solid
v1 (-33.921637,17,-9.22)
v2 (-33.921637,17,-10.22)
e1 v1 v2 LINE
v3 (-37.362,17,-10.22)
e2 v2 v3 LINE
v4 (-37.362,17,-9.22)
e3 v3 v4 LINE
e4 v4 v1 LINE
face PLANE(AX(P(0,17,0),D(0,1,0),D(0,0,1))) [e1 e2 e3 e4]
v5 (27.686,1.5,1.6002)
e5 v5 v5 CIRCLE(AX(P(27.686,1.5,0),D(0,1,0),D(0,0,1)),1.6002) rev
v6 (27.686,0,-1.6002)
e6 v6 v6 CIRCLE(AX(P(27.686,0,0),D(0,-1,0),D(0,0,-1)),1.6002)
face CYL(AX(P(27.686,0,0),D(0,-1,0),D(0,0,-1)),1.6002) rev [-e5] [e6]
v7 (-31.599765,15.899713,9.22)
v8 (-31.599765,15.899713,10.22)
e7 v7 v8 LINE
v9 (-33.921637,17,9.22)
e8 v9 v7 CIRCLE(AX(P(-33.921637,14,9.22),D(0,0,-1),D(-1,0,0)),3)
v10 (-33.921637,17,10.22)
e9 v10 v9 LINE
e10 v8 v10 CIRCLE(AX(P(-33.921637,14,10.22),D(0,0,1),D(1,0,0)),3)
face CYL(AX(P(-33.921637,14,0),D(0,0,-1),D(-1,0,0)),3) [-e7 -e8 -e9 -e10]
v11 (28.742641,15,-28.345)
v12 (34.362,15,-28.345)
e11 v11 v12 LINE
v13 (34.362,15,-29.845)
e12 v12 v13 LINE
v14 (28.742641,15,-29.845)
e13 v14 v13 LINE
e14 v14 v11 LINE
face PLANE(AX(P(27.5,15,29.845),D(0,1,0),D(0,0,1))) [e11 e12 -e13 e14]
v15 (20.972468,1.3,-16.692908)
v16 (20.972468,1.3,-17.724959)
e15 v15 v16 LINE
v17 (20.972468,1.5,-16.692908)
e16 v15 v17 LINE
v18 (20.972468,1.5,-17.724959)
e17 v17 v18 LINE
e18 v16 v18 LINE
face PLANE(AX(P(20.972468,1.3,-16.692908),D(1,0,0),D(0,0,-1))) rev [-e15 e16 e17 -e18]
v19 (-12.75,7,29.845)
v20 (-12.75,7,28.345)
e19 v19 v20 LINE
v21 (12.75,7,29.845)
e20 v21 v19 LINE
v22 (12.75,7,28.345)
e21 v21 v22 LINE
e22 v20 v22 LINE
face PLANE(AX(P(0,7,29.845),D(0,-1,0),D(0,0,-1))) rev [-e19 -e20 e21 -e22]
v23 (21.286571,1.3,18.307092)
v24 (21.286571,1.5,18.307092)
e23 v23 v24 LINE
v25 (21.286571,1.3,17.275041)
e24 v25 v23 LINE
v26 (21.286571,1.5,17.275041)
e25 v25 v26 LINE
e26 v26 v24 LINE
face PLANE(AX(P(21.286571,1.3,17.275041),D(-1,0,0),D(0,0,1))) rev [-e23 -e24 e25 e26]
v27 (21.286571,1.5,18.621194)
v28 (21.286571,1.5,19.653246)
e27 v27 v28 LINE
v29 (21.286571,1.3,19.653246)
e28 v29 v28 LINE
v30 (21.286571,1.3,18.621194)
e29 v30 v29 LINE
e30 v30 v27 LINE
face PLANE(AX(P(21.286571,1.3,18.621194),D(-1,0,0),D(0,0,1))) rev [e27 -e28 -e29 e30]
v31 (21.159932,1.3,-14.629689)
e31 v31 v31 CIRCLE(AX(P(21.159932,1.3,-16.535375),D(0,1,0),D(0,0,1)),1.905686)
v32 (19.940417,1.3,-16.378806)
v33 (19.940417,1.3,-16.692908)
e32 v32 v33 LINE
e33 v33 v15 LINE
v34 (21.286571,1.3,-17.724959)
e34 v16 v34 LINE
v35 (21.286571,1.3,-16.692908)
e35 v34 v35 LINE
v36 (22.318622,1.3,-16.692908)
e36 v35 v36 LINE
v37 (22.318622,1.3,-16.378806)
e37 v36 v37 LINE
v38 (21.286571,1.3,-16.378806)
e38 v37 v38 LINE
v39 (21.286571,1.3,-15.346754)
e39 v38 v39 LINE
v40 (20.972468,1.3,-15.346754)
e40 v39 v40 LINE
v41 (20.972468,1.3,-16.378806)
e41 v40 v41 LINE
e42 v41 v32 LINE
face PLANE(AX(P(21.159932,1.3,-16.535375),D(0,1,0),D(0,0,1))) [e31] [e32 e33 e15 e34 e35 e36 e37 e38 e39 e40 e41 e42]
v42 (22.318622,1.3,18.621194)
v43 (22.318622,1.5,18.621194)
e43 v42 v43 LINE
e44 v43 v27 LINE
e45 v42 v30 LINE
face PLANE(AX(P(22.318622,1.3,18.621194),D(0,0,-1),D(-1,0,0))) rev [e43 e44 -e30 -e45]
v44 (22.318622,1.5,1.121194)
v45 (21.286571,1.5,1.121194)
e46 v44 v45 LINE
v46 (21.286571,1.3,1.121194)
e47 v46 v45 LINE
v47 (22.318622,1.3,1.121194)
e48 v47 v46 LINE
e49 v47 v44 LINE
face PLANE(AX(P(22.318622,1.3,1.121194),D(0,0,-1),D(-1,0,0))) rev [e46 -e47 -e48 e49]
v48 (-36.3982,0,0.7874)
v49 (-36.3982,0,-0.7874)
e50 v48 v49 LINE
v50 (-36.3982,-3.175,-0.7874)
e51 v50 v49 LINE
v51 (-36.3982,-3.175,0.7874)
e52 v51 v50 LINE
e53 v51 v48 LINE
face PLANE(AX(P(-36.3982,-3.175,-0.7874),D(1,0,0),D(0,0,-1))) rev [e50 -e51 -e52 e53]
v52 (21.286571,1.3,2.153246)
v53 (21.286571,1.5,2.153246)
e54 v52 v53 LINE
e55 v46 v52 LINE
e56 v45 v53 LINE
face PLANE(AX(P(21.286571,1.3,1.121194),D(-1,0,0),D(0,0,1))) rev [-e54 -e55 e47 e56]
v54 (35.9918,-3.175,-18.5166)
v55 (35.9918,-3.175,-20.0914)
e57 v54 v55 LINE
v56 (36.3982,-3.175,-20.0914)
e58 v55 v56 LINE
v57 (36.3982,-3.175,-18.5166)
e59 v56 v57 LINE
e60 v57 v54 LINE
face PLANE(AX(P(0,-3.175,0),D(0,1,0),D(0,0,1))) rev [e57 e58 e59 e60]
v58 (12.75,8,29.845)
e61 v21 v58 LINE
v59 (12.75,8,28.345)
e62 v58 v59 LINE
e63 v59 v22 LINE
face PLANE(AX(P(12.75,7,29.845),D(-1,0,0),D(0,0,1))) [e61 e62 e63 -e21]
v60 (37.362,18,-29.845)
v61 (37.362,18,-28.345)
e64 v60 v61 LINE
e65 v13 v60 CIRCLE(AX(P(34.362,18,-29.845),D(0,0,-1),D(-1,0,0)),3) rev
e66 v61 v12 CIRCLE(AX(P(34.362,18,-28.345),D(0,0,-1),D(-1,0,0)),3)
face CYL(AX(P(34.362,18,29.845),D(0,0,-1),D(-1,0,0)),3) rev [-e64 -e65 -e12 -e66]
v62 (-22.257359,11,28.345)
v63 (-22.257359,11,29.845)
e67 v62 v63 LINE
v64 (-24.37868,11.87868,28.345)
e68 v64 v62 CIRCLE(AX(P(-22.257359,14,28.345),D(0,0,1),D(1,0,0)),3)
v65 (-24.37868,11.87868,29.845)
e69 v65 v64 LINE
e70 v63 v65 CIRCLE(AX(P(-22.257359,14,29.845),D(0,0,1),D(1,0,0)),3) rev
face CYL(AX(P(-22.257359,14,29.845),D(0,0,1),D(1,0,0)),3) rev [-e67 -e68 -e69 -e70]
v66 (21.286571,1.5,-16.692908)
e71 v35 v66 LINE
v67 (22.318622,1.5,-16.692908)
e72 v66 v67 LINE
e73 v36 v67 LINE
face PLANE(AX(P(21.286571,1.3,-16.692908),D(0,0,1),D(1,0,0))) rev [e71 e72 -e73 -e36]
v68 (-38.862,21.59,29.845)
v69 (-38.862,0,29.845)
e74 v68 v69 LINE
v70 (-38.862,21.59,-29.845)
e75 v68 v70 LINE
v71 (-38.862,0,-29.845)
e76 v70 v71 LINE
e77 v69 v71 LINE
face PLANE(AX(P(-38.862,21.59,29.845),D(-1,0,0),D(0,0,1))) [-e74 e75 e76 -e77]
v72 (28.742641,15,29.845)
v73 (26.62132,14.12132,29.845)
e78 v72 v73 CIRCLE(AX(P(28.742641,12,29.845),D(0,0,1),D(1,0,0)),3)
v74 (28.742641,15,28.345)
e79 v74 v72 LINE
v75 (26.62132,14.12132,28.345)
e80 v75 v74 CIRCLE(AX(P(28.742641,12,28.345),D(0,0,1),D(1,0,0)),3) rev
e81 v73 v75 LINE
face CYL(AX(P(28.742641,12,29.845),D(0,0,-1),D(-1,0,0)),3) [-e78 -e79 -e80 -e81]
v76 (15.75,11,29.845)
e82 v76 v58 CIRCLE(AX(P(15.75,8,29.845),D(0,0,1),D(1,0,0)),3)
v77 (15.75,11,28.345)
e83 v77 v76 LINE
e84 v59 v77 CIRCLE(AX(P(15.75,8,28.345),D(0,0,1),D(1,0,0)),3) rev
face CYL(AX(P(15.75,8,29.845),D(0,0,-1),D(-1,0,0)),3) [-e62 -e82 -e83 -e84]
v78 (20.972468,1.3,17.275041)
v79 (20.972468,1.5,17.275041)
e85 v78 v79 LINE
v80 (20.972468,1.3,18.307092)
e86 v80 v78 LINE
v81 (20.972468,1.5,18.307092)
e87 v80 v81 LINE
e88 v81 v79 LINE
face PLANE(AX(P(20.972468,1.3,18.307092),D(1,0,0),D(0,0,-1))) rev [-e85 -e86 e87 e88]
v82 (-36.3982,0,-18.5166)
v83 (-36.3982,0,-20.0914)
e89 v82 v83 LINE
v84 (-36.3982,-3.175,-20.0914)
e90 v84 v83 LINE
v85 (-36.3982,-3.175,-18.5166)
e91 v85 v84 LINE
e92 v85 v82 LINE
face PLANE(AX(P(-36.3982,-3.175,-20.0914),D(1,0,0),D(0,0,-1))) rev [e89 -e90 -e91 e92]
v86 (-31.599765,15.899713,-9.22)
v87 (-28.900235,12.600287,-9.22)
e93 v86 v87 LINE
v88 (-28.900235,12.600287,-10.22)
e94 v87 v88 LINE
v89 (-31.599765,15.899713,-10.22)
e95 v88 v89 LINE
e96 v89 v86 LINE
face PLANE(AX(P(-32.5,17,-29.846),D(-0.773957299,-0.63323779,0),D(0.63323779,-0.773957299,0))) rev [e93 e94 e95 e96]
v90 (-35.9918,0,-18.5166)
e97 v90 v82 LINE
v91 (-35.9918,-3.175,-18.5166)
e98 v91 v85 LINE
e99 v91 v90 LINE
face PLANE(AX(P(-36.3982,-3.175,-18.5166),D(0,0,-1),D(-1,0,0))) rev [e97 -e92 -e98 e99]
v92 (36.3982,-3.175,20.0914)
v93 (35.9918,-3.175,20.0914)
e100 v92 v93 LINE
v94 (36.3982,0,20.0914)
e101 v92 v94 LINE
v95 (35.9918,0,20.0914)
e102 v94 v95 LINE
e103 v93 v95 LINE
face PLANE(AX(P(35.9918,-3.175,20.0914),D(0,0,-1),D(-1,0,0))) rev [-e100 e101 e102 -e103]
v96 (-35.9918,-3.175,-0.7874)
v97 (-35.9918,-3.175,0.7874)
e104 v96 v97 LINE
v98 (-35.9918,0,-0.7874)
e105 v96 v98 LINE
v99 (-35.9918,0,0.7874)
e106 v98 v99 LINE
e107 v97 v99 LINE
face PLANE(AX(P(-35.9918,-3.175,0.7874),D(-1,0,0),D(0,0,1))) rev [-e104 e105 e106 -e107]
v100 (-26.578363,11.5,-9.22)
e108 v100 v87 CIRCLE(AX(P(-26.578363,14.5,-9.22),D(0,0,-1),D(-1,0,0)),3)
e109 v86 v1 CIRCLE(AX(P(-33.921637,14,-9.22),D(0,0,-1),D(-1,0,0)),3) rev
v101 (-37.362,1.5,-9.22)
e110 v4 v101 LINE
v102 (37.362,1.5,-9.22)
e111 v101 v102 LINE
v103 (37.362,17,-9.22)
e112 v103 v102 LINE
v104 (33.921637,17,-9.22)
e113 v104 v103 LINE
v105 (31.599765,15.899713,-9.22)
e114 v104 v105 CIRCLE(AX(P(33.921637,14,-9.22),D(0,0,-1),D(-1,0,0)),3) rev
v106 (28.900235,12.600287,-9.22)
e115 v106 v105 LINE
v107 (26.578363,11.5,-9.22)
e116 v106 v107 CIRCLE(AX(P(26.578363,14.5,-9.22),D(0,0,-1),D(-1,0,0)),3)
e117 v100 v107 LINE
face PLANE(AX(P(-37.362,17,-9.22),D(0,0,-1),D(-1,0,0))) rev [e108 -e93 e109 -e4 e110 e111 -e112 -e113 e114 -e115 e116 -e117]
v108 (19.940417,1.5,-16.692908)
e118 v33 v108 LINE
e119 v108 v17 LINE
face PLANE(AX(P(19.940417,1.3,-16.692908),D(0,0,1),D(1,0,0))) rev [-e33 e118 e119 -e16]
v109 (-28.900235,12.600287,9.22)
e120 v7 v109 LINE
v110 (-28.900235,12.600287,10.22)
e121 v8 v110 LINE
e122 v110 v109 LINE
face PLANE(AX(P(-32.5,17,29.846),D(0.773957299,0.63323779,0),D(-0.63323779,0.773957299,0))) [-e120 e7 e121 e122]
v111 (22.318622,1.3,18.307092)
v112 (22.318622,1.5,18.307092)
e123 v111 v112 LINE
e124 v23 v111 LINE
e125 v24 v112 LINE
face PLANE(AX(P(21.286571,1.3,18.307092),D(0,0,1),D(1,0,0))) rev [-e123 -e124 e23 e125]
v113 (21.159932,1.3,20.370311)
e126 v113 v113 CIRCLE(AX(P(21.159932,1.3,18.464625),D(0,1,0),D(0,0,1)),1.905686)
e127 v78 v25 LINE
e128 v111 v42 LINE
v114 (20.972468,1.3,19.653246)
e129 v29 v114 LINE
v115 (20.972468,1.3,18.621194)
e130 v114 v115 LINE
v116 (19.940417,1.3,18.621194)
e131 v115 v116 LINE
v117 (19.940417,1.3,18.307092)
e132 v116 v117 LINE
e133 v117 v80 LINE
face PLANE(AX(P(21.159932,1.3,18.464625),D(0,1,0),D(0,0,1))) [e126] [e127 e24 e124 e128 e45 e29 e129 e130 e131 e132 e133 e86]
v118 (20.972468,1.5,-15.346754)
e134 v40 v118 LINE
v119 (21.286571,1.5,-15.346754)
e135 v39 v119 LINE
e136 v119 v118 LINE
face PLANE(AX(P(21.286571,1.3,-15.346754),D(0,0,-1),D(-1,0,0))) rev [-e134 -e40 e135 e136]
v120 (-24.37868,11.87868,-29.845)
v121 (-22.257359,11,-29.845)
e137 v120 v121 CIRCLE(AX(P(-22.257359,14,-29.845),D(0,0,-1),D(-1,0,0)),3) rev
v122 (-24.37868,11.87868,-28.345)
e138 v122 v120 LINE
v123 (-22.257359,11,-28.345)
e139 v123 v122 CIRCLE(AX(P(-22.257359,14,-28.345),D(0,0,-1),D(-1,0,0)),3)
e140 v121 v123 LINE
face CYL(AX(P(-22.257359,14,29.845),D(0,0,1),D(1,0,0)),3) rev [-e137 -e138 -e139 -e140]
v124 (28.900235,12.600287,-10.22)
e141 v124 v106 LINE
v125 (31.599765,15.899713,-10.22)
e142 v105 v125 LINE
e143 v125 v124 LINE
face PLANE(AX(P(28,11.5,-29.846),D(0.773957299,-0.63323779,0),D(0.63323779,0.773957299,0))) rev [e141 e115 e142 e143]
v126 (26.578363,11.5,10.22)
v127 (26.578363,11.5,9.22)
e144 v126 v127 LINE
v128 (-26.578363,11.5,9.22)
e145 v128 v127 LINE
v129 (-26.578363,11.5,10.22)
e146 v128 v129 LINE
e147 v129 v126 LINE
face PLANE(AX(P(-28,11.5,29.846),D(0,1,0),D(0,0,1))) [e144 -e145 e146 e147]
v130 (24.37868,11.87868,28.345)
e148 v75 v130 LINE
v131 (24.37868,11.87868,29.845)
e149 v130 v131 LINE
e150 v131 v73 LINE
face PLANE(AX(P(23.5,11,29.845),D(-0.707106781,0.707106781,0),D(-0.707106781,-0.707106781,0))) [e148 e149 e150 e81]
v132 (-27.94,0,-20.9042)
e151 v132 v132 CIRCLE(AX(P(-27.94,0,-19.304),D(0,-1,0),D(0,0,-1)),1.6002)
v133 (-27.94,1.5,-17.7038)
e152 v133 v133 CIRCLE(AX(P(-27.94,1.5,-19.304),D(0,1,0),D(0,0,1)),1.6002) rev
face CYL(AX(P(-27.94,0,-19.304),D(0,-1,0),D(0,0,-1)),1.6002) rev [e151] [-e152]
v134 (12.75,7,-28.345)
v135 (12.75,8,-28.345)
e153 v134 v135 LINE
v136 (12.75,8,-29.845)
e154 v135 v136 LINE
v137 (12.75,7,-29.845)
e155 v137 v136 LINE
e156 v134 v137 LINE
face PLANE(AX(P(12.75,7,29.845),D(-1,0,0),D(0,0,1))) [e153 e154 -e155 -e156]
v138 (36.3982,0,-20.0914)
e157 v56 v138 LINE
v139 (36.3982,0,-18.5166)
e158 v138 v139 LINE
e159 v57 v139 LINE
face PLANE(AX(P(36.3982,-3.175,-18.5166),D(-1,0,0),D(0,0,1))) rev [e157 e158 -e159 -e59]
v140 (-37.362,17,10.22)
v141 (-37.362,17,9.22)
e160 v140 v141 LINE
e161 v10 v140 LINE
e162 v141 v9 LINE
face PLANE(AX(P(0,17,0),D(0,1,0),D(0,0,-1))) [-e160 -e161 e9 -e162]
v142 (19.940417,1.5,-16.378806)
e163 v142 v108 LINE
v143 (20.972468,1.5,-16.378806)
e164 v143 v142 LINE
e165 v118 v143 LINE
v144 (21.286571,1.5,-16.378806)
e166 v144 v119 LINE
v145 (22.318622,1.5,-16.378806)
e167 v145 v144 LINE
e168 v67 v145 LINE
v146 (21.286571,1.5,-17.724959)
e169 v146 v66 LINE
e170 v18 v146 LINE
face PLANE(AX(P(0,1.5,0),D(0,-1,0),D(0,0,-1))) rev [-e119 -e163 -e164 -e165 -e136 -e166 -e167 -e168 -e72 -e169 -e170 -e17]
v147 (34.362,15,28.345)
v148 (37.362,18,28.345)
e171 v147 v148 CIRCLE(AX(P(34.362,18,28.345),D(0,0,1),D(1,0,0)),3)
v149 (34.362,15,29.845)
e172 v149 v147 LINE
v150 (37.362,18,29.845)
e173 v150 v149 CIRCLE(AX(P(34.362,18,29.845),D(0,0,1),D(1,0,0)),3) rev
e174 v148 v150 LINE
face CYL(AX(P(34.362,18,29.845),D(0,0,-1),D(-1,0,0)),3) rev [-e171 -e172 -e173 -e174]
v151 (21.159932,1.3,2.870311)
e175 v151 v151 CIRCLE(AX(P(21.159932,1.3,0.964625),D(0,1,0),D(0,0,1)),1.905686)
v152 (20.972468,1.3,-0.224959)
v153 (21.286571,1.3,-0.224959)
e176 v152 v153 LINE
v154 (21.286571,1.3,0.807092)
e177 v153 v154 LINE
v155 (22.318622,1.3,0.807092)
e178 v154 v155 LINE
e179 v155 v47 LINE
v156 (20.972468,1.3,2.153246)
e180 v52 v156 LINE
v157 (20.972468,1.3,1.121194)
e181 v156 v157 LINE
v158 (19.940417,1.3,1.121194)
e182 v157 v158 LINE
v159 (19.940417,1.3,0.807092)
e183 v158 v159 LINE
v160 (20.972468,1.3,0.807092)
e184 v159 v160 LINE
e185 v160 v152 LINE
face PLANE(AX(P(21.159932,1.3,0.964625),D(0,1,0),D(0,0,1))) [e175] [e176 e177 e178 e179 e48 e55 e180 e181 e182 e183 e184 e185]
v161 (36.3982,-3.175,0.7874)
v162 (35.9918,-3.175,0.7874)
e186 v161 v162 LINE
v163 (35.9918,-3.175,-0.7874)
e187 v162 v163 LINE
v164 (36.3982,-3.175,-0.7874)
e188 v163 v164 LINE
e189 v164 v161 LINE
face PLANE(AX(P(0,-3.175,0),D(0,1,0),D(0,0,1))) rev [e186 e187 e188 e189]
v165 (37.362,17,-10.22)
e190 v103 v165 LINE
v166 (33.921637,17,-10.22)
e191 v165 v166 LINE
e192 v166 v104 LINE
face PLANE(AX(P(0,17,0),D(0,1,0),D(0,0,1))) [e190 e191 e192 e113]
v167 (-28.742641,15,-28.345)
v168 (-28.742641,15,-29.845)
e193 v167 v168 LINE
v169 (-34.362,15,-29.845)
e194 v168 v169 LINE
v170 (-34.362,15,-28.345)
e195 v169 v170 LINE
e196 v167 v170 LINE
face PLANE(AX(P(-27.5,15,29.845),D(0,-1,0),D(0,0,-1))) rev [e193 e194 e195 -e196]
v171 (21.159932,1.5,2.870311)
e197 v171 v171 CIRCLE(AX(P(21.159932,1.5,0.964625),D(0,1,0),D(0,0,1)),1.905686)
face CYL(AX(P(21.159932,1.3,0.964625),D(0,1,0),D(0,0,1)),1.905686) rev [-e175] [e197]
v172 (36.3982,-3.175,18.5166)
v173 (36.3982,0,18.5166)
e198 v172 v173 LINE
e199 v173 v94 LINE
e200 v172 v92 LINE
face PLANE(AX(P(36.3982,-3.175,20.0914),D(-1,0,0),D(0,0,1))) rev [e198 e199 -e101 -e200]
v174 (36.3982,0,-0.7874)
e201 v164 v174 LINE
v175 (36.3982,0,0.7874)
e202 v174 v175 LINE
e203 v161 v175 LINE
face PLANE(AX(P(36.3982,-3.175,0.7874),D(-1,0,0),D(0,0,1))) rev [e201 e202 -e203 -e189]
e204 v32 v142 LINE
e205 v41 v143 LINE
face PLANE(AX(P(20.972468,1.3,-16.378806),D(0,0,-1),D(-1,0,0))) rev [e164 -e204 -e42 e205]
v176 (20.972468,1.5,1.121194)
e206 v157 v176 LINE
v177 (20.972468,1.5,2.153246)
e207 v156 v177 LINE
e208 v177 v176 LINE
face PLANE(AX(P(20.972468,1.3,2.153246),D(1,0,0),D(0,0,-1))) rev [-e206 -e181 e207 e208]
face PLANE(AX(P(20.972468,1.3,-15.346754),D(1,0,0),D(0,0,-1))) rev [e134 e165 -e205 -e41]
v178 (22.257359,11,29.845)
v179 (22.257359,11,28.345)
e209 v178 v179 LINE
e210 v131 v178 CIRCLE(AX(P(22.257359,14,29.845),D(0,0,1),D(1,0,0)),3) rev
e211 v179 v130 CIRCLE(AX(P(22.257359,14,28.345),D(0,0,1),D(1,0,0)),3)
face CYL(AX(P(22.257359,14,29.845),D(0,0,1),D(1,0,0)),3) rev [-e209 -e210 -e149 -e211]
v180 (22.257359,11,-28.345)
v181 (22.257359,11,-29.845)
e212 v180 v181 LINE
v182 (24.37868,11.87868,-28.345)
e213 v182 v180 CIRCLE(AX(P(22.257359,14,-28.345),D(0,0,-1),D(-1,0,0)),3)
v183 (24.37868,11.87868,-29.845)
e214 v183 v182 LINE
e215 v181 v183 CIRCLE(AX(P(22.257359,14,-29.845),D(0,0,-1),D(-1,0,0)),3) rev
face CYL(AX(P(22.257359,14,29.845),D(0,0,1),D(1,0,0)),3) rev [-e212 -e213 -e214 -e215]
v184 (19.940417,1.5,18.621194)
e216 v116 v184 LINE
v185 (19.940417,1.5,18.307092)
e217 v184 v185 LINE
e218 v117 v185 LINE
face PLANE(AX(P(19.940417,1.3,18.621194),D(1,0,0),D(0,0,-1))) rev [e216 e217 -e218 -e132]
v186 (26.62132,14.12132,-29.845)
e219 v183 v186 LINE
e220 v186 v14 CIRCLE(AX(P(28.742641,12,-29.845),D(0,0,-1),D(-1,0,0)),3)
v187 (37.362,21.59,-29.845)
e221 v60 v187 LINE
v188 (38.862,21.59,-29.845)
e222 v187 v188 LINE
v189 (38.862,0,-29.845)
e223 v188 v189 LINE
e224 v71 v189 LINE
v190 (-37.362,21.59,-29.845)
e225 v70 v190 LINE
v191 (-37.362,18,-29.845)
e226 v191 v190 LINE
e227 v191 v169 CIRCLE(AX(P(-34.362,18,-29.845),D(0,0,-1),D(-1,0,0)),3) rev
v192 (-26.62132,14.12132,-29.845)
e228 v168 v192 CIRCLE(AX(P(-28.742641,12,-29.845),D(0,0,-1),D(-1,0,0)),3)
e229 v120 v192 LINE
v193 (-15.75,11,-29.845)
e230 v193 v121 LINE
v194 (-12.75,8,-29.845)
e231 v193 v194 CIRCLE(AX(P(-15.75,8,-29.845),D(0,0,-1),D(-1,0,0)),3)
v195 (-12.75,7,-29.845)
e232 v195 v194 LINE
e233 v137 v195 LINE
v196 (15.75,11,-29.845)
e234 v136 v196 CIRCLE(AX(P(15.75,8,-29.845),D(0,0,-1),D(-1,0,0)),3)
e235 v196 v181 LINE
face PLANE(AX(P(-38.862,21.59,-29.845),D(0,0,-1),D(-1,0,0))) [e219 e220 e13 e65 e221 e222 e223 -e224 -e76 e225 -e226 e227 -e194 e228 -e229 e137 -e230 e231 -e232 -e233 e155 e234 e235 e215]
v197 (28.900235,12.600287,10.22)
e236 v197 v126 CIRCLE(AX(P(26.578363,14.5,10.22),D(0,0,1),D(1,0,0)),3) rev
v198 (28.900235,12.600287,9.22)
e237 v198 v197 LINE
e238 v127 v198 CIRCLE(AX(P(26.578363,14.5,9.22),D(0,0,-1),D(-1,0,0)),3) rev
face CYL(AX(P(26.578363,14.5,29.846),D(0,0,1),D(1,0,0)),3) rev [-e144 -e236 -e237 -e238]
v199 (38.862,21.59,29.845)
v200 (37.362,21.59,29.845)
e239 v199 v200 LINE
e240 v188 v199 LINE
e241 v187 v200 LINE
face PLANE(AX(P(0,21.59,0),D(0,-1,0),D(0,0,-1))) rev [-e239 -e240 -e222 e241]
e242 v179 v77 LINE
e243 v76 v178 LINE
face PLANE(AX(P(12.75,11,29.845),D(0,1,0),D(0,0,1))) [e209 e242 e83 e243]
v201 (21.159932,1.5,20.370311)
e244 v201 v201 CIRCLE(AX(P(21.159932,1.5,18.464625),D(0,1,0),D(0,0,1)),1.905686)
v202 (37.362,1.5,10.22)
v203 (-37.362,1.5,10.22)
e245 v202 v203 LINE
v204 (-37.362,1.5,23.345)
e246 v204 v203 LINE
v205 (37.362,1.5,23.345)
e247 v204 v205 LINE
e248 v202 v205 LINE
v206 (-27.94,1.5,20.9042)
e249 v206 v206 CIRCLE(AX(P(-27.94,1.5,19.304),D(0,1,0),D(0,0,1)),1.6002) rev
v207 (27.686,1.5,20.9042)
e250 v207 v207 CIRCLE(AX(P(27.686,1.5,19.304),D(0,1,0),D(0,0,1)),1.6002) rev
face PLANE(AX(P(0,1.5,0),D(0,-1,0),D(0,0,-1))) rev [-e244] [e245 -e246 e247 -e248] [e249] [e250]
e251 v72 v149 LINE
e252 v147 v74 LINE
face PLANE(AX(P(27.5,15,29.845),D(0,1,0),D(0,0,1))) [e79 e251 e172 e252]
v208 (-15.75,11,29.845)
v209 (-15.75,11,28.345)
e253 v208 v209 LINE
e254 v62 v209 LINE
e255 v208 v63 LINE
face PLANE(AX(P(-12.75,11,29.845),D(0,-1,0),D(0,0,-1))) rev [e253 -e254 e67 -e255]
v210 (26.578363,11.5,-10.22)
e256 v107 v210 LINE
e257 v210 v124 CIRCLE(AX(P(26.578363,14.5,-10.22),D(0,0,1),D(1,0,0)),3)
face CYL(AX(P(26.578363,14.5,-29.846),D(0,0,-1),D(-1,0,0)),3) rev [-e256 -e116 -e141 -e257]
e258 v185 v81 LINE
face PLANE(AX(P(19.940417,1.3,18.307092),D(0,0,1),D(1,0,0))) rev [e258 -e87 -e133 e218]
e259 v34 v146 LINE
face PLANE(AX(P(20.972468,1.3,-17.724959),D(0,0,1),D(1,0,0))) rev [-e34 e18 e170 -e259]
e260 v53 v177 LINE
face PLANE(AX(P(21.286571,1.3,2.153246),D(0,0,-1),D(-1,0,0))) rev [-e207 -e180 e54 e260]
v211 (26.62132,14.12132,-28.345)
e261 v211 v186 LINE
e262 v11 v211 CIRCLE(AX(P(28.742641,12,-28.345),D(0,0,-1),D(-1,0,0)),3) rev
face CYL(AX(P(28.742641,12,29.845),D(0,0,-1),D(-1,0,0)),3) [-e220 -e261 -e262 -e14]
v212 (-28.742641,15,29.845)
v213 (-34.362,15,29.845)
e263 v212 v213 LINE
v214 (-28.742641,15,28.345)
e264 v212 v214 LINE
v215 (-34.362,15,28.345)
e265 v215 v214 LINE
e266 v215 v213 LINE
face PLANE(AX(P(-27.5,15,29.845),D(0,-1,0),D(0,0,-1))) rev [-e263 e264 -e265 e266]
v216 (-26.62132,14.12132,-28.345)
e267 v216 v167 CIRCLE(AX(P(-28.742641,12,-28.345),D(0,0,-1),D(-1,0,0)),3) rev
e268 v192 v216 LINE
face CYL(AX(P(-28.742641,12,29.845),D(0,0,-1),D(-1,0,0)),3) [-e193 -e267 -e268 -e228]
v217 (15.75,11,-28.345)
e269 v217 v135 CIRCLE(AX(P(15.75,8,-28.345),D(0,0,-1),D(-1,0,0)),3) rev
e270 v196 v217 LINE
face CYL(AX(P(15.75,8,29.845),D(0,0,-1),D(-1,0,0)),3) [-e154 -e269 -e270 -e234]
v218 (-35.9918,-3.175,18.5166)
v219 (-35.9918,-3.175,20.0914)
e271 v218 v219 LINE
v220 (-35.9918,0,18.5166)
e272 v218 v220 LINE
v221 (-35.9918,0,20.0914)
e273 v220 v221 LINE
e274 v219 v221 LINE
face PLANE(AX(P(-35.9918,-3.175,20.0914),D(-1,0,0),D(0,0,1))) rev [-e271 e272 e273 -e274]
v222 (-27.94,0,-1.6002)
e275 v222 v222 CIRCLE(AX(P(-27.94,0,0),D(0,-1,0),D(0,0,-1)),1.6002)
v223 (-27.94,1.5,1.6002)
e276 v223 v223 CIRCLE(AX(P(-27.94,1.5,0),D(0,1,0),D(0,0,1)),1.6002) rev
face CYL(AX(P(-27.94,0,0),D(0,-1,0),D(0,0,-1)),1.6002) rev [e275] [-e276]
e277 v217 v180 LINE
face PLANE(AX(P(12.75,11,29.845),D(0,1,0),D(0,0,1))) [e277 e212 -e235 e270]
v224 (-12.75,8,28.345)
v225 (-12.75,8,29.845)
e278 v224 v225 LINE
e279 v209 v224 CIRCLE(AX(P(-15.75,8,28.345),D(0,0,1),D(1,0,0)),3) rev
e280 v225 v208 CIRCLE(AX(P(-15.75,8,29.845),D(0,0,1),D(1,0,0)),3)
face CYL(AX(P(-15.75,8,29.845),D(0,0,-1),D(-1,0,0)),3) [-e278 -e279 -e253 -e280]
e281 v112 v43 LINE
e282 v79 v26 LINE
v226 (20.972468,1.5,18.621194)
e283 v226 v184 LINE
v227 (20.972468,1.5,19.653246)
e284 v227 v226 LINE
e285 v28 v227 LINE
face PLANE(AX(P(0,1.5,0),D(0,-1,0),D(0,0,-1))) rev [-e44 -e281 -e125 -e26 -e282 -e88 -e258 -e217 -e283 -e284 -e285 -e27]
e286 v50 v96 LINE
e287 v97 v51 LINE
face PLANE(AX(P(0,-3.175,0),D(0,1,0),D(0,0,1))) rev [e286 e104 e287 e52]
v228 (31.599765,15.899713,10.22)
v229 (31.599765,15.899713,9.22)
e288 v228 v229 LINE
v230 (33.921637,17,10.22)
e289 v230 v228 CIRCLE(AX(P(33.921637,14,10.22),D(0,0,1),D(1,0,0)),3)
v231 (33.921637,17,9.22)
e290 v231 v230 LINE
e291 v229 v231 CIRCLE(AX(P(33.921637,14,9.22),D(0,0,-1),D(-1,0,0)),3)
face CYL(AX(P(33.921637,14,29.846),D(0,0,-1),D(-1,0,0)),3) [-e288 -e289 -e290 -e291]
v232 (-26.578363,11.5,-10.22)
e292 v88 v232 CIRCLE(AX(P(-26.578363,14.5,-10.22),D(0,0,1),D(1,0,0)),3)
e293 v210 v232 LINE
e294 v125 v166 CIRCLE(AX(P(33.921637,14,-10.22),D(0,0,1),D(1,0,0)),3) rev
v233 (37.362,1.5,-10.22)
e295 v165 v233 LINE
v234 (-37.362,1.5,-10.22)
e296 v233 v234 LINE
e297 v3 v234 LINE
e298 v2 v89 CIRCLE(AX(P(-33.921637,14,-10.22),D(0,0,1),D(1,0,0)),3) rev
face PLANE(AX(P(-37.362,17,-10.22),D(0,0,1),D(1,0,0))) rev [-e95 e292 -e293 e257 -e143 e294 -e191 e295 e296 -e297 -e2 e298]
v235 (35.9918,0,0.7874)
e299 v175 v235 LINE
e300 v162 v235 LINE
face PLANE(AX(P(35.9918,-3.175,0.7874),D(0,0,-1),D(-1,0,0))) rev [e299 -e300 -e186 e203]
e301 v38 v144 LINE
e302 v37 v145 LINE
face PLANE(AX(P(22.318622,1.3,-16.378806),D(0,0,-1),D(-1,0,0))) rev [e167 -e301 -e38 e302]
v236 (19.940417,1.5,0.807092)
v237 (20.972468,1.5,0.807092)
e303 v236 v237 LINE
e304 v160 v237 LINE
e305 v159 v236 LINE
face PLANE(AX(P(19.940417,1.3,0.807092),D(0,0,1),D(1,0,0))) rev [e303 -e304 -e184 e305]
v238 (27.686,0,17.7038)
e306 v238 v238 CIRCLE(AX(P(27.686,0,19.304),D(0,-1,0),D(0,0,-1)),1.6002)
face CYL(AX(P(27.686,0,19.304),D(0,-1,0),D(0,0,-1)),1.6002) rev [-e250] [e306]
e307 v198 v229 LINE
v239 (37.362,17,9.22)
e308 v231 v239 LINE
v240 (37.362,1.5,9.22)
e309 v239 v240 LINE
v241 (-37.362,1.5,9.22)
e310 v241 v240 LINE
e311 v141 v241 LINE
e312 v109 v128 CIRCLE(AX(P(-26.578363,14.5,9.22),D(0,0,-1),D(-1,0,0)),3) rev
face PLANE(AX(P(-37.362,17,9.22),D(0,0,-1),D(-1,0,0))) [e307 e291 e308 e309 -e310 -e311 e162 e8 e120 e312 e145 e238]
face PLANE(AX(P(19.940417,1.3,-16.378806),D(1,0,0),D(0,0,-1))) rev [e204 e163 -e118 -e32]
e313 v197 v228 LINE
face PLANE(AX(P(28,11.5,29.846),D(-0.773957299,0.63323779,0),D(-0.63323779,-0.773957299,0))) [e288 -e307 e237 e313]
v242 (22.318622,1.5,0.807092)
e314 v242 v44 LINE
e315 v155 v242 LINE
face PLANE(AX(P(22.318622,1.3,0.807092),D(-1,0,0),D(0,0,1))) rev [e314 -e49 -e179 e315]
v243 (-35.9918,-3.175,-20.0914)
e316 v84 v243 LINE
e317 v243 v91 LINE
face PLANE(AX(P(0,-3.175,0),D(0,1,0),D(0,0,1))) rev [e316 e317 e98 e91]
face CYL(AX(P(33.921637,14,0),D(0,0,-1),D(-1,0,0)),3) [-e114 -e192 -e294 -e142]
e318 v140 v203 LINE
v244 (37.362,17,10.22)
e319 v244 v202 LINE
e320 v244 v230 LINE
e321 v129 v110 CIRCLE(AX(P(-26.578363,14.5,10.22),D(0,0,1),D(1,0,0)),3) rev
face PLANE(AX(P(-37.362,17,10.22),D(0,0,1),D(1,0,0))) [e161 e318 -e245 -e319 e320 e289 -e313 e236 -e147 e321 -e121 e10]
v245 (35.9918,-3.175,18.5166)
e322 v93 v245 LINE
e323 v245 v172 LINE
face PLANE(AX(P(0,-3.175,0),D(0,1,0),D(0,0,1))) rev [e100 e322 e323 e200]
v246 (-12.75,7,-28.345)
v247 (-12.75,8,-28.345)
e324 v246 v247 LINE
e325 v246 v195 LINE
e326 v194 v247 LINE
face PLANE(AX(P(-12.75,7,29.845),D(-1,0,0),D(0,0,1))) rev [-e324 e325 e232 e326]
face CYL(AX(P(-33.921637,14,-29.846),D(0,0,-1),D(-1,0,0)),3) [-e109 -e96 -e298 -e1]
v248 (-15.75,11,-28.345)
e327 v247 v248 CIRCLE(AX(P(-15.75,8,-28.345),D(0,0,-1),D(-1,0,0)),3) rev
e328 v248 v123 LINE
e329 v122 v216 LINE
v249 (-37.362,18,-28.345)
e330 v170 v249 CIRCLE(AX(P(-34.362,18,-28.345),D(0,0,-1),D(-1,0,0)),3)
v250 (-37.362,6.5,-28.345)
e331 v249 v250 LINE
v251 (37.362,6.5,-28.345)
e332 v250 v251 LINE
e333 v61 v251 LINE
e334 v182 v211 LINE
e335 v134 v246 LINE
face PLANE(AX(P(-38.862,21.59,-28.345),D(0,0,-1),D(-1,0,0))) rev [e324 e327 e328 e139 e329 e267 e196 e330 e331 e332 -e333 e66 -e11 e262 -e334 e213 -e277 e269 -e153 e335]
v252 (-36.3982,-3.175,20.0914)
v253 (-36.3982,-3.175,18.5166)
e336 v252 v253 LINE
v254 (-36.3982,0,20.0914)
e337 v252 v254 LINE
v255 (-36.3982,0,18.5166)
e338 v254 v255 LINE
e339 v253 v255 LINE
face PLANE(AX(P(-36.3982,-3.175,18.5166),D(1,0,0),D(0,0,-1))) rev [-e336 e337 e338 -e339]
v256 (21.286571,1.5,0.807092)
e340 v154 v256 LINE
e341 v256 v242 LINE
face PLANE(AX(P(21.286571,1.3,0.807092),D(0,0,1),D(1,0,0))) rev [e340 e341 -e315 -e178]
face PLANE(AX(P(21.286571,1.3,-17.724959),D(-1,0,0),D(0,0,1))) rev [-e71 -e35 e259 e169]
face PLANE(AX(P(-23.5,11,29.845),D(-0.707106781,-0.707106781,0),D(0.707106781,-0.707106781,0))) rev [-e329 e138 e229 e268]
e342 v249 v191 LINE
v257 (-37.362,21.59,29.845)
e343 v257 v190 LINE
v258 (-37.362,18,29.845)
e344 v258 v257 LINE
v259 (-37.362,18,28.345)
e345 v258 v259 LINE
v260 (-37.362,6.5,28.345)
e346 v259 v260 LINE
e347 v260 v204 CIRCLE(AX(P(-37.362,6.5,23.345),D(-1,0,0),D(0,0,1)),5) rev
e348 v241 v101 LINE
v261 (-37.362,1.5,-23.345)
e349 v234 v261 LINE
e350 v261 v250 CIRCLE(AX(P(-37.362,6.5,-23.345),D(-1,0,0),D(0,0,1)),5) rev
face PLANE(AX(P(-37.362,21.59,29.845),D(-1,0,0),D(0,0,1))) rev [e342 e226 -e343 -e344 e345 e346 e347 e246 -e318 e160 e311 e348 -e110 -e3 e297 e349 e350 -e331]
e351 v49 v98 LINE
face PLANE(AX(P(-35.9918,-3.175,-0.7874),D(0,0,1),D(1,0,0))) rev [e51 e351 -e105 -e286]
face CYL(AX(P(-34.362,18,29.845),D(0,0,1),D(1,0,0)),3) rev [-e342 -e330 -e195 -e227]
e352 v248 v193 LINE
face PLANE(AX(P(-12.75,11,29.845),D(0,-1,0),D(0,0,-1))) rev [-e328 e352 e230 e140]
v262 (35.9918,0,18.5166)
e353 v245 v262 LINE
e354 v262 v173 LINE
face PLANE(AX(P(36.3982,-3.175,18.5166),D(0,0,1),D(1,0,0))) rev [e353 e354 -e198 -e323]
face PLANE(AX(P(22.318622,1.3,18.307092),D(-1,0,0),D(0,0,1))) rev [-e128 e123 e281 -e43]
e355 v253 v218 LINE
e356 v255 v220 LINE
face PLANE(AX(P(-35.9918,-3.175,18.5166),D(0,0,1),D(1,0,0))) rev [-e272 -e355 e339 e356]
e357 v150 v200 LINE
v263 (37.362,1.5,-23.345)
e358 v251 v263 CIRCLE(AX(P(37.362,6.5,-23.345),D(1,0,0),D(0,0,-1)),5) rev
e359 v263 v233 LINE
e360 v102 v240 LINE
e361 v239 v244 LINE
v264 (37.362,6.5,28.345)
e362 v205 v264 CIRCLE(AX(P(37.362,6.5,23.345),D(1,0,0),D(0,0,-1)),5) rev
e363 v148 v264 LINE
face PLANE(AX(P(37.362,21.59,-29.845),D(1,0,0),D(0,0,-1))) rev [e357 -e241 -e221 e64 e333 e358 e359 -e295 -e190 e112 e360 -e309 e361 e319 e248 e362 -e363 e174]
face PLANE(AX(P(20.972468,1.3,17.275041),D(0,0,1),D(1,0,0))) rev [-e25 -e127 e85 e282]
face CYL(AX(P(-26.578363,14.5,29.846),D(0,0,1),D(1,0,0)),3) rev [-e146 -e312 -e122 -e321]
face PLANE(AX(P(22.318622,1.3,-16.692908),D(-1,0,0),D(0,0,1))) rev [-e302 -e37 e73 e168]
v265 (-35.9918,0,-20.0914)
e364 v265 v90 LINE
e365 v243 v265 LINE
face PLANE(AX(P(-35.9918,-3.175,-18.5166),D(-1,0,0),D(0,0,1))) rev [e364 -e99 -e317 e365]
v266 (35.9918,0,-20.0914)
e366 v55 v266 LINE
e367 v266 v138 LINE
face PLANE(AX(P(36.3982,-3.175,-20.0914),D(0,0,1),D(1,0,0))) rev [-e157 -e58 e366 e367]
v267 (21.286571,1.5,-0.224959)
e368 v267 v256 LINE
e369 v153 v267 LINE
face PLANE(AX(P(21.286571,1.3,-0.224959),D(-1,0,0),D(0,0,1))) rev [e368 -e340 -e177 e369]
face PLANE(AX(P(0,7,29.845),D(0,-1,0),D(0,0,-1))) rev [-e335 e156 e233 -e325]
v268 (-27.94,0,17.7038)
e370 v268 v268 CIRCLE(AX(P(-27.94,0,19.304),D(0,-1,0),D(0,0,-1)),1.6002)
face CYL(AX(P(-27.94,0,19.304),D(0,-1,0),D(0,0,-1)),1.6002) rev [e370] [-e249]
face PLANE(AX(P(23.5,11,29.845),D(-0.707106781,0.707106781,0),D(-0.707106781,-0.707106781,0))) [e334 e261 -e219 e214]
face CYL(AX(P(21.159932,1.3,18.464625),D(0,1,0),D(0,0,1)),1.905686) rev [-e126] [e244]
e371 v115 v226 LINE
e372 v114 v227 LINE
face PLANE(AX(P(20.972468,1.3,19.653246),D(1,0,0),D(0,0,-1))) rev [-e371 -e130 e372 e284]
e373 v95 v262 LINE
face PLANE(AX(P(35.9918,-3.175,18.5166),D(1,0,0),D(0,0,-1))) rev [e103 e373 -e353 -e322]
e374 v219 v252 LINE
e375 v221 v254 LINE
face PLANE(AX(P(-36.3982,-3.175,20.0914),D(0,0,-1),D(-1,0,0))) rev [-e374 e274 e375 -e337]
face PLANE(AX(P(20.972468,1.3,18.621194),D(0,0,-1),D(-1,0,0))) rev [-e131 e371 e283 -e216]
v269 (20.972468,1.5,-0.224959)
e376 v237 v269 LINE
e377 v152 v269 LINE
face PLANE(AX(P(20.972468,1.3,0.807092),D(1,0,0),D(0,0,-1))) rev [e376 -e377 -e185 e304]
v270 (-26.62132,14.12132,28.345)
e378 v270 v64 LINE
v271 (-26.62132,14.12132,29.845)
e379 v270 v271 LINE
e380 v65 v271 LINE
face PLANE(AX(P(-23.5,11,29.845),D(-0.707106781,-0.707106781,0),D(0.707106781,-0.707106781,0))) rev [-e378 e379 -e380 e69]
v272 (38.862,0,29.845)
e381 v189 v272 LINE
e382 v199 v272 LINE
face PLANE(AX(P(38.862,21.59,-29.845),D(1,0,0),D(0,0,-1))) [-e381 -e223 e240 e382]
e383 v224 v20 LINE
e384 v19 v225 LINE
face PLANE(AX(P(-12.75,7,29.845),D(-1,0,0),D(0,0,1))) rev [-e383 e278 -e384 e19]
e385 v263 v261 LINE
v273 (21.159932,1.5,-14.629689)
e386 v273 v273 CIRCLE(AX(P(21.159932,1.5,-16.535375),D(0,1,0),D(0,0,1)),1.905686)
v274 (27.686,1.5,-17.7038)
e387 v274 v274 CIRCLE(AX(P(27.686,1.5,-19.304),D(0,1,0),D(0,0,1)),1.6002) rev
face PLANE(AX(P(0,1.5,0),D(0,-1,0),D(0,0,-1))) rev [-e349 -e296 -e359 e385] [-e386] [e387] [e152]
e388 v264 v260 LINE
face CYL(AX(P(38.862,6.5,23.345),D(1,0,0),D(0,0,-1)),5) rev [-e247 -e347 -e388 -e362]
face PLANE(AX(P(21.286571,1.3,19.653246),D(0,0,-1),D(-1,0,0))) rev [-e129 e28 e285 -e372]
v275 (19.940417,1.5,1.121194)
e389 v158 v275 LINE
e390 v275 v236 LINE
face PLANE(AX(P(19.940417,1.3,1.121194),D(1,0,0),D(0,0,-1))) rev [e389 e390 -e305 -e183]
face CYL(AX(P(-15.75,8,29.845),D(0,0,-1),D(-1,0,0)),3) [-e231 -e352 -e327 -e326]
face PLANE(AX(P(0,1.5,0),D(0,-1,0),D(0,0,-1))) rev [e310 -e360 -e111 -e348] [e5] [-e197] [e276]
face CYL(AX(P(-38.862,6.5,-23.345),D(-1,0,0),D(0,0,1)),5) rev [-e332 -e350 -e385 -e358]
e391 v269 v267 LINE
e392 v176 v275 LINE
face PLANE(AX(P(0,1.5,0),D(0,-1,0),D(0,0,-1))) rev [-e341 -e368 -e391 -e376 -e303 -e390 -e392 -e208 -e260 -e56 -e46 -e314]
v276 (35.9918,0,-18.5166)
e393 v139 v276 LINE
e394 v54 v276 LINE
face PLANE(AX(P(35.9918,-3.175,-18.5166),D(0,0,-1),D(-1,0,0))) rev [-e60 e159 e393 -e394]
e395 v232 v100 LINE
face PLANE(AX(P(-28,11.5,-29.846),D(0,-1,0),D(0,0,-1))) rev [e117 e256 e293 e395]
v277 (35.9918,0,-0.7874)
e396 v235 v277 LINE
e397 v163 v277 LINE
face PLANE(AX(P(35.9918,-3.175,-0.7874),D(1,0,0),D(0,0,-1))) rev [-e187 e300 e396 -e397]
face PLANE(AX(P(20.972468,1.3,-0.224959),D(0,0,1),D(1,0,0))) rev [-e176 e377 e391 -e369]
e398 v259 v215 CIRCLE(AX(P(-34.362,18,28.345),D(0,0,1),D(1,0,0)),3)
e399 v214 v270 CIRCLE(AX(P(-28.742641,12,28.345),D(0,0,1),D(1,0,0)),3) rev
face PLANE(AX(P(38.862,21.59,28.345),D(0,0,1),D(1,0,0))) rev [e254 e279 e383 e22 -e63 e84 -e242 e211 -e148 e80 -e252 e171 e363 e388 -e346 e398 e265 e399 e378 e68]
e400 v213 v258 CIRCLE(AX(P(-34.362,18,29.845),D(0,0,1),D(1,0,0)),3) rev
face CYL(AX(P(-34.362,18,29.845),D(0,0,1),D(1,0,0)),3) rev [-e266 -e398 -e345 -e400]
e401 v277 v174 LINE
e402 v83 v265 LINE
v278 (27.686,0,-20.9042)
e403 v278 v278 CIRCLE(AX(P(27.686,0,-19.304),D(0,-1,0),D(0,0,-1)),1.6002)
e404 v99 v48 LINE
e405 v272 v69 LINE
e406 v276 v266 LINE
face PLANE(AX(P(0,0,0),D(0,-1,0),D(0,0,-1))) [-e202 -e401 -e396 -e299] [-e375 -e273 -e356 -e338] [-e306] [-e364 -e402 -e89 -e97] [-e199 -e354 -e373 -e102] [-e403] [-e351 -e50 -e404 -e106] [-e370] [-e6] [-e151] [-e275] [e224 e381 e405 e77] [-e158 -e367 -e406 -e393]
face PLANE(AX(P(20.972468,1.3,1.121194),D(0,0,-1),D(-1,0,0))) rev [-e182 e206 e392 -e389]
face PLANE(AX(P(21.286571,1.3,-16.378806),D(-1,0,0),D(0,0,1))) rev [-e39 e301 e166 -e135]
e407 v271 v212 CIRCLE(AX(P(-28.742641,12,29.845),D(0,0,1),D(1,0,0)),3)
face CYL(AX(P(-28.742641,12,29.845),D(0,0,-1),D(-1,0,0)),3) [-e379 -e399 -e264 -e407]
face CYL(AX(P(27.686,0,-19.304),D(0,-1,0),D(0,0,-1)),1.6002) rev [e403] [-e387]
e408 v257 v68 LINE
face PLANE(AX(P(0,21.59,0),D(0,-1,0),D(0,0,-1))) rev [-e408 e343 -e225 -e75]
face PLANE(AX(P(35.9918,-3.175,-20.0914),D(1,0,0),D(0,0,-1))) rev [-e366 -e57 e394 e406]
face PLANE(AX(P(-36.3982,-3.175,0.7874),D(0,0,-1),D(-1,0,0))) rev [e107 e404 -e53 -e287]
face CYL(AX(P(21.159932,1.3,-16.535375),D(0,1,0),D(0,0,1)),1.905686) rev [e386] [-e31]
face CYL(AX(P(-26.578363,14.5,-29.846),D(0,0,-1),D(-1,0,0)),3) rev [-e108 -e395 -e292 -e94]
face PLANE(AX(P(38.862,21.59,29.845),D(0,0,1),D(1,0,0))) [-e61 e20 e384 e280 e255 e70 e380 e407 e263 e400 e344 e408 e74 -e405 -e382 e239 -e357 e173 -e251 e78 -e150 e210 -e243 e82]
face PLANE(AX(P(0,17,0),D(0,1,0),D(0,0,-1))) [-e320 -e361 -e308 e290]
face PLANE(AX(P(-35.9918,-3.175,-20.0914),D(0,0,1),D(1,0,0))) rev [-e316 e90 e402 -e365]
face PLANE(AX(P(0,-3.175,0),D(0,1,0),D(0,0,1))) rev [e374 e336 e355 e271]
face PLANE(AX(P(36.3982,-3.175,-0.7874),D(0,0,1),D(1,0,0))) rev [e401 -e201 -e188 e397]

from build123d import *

# Parameters (mm, degrees)
SKETCH1_W                 = 77.724
SKETCH1_H                 = 59.69
BOSS_EXTRUDE1_DEPTH       = 21.59
SKETCH2_W                 = 0.4064
SKETCH2_H                 = 1.5748
BOSS_EXTRUDE2_DEPTH       = 3.175
SKETCH3_W                 = 0.4064
SKETCH3_H                 = 1.5748
BOSS_EXTRUDE3_DEPTH       = 3.175
SKETCH4_W                 = 0.4064
SKETCH4_H                 = 1.5748
BOSS_EXTRUDE4_DEPTH       = 3.175
SKETCH5_W                 = 0.4064
SKETCH5_H                 = 1.5748
BOSS_EXTRUDE5_DEPTH       = 3.175
SKETCH6_W                 = 0.4064
SKETCH6_H                 = 1.5748
BOSS_EXTRUDE6_DEPTH       = 3.175
SKETCH7_W                 = 0.4064
SKETCH7_H                 = 1.5748
BOSS_EXTRUDE7_DEPTH       = 3.175
F_4_CLEARANCE_HOLE1_D     = 3.2004
F_4_CLEARANCE_HOLE1_DEPTH = 5.08
SHELL1_START              = 1.5
SHELL1_OUTLINE_W          = 74.724
SHELL1_OUTLINE_H          = 56.69
SHELL1_OUTLINE_R          = 3.1002
SHELL1_DEPTH              = 20.09
SHELL1_START_2            = 6.58
SHELL1_2_OUTLINE_R        = 3.1002
SHELL1_2_DEPTH            = 15.01
FILLET1_R                 = 5
CUT_EXTRUDE3_DEPTH        = 75.426334345
SKETCH11_W                = 74.724
SKETCH11_H                = 46.69
CUT_EXTRUDE4_DEPTH        = 53.958353156
SKETCH12_W                = 74.724
SKETCH12_H                = 1
BOSS_EXTRUDE8_DEPTH       = 15.5
CUT_EXTRUDE5_REACH        = 61.182
FILLET2_R                 = 3
SKETCH14_R                = 1.905686258
CUT_EXTRUDE6_DEPTH        = 0.2
LPATTERN1_COUNT           = 3
LPATTERN1_PITCH           = 17.5


# Read off the part's stored shape, not the designer's step: Shell1
with BuildPart() as part:
    # Sketch1 → Boss-Extrude1 (new body)
    with BuildSketch(Plane.XZ):
        Rectangle(SKETCH1_W, SKETCH1_H)
    extrude(amount=-BOSS_EXTRUDE1_DEPTH)

    # Sketch2 → Boss-Extrude2 (add)
    with BuildSketch(Plane.XZ):
        with Locations((-36.195, 0)):
            Rectangle(SKETCH2_W, SKETCH2_H)
    extrude(amount=BOSS_EXTRUDE2_DEPTH)

    # Sketch3 → Boss-Extrude3 (add)
    with BuildSketch(Plane.XZ):
        with Locations((36.195, 0)):
            Rectangle(SKETCH3_W, SKETCH3_H)
    extrude(amount=BOSS_EXTRUDE3_DEPTH)

    # Sketch4 → Boss-Extrude4 (add)
    with BuildSketch(Plane.XZ):
        with Locations((-36.195, 19.304)):
            Rectangle(SKETCH4_W, SKETCH4_H)
    extrude(amount=BOSS_EXTRUDE4_DEPTH)

    # Sketch5 → Boss-Extrude5 (add)
    with BuildSketch(Plane.XZ):
        with Locations((36.195, 19.304)):
            Rectangle(SKETCH5_W, SKETCH5_H)
    extrude(amount=BOSS_EXTRUDE5_DEPTH)

    # Sketch6 → Boss-Extrude6 (add)
    with BuildSketch(Plane.XZ):
        with Locations((36.195, -19.304)):
            Rectangle(SKETCH6_W, SKETCH6_H)
    extrude(amount=BOSS_EXTRUDE6_DEPTH)

    # Sketch7 → Boss-Extrude7 (add)
    with BuildSketch(Plane.XZ):
        with Locations((-36.195, -19.304)):
            Rectangle(SKETCH7_W, SKETCH7_H)
    extrude(amount=BOSS_EXTRUDE7_DEPTH)

    # #4 Clearance Hole1
    with Locations(Plane(origin=(0, 0, 0), x_dir=(-1, 0, 0), z_dir=(0, -1, 0))):
        with Locations((27.94, 19.304), (27.94, 0), (-27.686, 19.304), (-27.686, 0), (-27.686, -19.304), (27.94, -19.304)):
            Hole(F_4_CLEARANCE_HOLE1_D / 2, depth=F_4_CLEARANCE_HOLE1_DEPTH)

    # Shell1 outline → Shell1 (cut)
    with BuildSketch(Plane(origin=(0, 0, 0), x_dir=(1, 0, 0), z_dir=(0, 1, 0)).offset(SHELL1_START)):
        Rectangle(SHELL1_OUTLINE_W, SHELL1_OUTLINE_H)
        with Locations((-27.94, -19.304)):
            Circle(SHELL1_OUTLINE_R, mode=Mode.SUBTRACT)
        with Locations((-27.94, 0)):
            Circle(SHELL1_OUTLINE_R, mode=Mode.SUBTRACT)
        with Locations((27.686, -19.304)):
            Circle(SHELL1_OUTLINE_R, mode=Mode.SUBTRACT)
        with Locations((27.686, 0)):
            Circle(SHELL1_OUTLINE_R, mode=Mode.SUBTRACT)
        with Locations((-27.94, 19.304)):
            Circle(SHELL1_OUTLINE_R, mode=Mode.SUBTRACT)
        with Locations((27.686, 19.304)):
            Circle(SHELL1_OUTLINE_R, mode=Mode.SUBTRACT)
    extrude(amount=SHELL1_DEPTH, mode=Mode.SUBTRACT)

    # Shell1 2 outline → Shell1 2 (cut)
    with BuildSketch(Plane(origin=(0, 0, 0), x_dir=(1, 0, 0), z_dir=(0, 1, 0)).offset(SHELL1_START_2)):
        with Locations((-27.94, -19.304)):
            Circle(SHELL1_2_OUTLINE_R)
        with Locations((27.686, -19.304)):
            Circle(SHELL1_2_OUTLINE_R)
        with Locations((27.686, 0)):
            Circle(SHELL1_2_OUTLINE_R)
        with Locations((27.686, 19.304)):
            Circle(SHELL1_2_OUTLINE_R)
        with Locations((-27.94, 0)):
            Circle(SHELL1_2_OUTLINE_R)
        with Locations((-27.94, 19.304)):
            Circle(SHELL1_2_OUTLINE_R)
    extrude(amount=SHELL1_2_DEPTH, mode=Mode.SUBTRACT)

    # Fillet1
    fillet1_edges = [part.edges().sort_by_distance(p)[0] for p in [
        (0, 1.5, 28.345),
        (0, 1.5, -28.345),
    ]]
    fillet(fillet1_edges, radius=FILLET1_R)

    # Sketch10 → Cut-Extrude3 (cut, through all)
    with BuildSketch(Plane(origin=(0, 0, -29.845), x_dir=(-1, 0, 0), z_dir=(0, 0, -1))):
        Polygon((0, 7), (12.75, 7), (12.75, 11), (23.5, 11), (27.5, 15), (37.362, 15), (37.362, 21.59), (0, 21.59), align=None)
    cut_extrude3 = extrude(amount=-CUT_EXTRUDE3_DEPTH, mode=Mode.SUBTRACT)

    # Mirror1: Cut-Extrude3 across plane
    add(cut_extrude3.mirror(Plane(origin=(0, 0, 0), x_dir=(0, 0, 1), z_dir=(1, 0, 0))), mode=Mode.SUBTRACT)

    # Sketch11 → Cut-Extrude4 (cut, through all)
    with BuildSketch(Plane(origin=(0, 1.5, 0), x_dir=(1, 0, 0), z_dir=(0, 1, 0))):
        Rectangle(SKETCH11_W, SKETCH11_H)
    extrude(amount=CUT_EXTRUDE4_DEPTH, mode=Mode.SUBTRACT)

    # Sketch12 → Boss-Extrude8 (add)
    with BuildSketch(Plane(origin=(0, 1.5, 0), x_dir=(1, 0, 0), z_dir=(0, 1, 0))):
        with Locations((0, 9.72)):
            Rectangle(SKETCH12_W, SKETCH12_H)
    boss_extrude8 = extrude(amount=BOSS_EXTRUDE8_DEPTH)

    # Sketch13 → Cut-Extrude5 (cut, up to next)
    with BuildSketch(Plane.XY.offset(-9.22), mode=Mode.PRIVATE) as cut_extrude5_sk1:
        Polygon((-32.5, 17), (-28, 11.5), (28, 11.5), (32.5, 17), align=None)
    cut_extrude5_tool1 = extrude(cut_extrude5_sk1.sketch, amount=-CUT_EXTRUDE5_REACH, mode=Mode.PRIVATE) & part.part
    cut_extrude5 = cut_extrude5_tool1.solids().sort_by_distance((0, 14.318182, -9.22))[0]
    add(cut_extrude5, mode=Mode.SUBTRACT)

    # Mirror2: Boss-Extrude8, Cut-Extrude5 across plane
    add(boss_extrude8.mirror(Plane.XY))
    add(cut_extrude5.mirror(Plane.XY), mode=Mode.SUBTRACT)

    # Fillet2
    fillet2_edges = [part.edges().sort_by_distance(p)[0] for p in [
        (-27.5, 15, 29.095),
        (-27.5, 15, -29.095),
        (-23.5, 11, 29.095),
        (-23.5, 11, -29.095),
        (-12.75, 11, 29.095),
        (-12.75, 11, -29.095),
        (-37.362, 15, 29.095),
        (-37.362, 15, -29.095),
        (12.75, 11, 29.095),
        (12.75, 11, -29.095),
        (23.5, 11, 29.095),
        (23.5, 11, -29.095),
        (37.362, 15, 29.095),
        (37.362, 15, -29.095),
        (27.5, 15, 29.095),
        (27.5, 15, -29.095),
        (-32.5, 17, -9.72),
        (32.5, 17, -9.72),
        (28, 11.5, -9.72),
        (-28, 11.5, -9.72),
        (32.5, 17, 9.72),
        (-32.5, 17, 9.72),
        (-28, 11.5, 9.72),
        (28, 11.5, 9.72),
    ]]
    fillet(fillet2_edges, radius=FILLET2_R)

    # Sketch14 → Cut-Extrude6 (cut)
    with BuildSketch(Plane(origin=(0, 1.5, 0), x_dir=(1, 0, 0), z_dir=(0, 1, 0))):
        with Locations(Location((21.159931599, 16.535374869, 0), (0, 0, 270))):
            Circle(SKETCH14_R)
        Polygon((20.972468472, 16.692908218), (20.972468472, 17.7249595), (21.286571036, 17.7249595), (21.286571036, 16.692908218), (22.318622318, 16.692908218), (22.318622318, 16.378805654), (21.286571036, 16.378805654), (21.286571036, 15.346754372), (20.972468472, 15.346754372), (20.972468472, 16.378805654), (19.94041719, 16.378805654), (19.94041719, 16.692908218), align=None, mode=Mode.SUBTRACT)
    cut_extrude6 = extrude(amount=-CUT_EXTRUDE6_DEPTH, mode=Mode.SUBTRACT)

    # LPattern1: Cut-Extrude6 ×3
    with Locations(*[(0, 0, i * LPATTERN1_PITCH) for i in range(1, LPATTERN1_COUNT)]):
        add(cut_extrude6, mode=Mode.SUBTRACT)


solid = part.part
